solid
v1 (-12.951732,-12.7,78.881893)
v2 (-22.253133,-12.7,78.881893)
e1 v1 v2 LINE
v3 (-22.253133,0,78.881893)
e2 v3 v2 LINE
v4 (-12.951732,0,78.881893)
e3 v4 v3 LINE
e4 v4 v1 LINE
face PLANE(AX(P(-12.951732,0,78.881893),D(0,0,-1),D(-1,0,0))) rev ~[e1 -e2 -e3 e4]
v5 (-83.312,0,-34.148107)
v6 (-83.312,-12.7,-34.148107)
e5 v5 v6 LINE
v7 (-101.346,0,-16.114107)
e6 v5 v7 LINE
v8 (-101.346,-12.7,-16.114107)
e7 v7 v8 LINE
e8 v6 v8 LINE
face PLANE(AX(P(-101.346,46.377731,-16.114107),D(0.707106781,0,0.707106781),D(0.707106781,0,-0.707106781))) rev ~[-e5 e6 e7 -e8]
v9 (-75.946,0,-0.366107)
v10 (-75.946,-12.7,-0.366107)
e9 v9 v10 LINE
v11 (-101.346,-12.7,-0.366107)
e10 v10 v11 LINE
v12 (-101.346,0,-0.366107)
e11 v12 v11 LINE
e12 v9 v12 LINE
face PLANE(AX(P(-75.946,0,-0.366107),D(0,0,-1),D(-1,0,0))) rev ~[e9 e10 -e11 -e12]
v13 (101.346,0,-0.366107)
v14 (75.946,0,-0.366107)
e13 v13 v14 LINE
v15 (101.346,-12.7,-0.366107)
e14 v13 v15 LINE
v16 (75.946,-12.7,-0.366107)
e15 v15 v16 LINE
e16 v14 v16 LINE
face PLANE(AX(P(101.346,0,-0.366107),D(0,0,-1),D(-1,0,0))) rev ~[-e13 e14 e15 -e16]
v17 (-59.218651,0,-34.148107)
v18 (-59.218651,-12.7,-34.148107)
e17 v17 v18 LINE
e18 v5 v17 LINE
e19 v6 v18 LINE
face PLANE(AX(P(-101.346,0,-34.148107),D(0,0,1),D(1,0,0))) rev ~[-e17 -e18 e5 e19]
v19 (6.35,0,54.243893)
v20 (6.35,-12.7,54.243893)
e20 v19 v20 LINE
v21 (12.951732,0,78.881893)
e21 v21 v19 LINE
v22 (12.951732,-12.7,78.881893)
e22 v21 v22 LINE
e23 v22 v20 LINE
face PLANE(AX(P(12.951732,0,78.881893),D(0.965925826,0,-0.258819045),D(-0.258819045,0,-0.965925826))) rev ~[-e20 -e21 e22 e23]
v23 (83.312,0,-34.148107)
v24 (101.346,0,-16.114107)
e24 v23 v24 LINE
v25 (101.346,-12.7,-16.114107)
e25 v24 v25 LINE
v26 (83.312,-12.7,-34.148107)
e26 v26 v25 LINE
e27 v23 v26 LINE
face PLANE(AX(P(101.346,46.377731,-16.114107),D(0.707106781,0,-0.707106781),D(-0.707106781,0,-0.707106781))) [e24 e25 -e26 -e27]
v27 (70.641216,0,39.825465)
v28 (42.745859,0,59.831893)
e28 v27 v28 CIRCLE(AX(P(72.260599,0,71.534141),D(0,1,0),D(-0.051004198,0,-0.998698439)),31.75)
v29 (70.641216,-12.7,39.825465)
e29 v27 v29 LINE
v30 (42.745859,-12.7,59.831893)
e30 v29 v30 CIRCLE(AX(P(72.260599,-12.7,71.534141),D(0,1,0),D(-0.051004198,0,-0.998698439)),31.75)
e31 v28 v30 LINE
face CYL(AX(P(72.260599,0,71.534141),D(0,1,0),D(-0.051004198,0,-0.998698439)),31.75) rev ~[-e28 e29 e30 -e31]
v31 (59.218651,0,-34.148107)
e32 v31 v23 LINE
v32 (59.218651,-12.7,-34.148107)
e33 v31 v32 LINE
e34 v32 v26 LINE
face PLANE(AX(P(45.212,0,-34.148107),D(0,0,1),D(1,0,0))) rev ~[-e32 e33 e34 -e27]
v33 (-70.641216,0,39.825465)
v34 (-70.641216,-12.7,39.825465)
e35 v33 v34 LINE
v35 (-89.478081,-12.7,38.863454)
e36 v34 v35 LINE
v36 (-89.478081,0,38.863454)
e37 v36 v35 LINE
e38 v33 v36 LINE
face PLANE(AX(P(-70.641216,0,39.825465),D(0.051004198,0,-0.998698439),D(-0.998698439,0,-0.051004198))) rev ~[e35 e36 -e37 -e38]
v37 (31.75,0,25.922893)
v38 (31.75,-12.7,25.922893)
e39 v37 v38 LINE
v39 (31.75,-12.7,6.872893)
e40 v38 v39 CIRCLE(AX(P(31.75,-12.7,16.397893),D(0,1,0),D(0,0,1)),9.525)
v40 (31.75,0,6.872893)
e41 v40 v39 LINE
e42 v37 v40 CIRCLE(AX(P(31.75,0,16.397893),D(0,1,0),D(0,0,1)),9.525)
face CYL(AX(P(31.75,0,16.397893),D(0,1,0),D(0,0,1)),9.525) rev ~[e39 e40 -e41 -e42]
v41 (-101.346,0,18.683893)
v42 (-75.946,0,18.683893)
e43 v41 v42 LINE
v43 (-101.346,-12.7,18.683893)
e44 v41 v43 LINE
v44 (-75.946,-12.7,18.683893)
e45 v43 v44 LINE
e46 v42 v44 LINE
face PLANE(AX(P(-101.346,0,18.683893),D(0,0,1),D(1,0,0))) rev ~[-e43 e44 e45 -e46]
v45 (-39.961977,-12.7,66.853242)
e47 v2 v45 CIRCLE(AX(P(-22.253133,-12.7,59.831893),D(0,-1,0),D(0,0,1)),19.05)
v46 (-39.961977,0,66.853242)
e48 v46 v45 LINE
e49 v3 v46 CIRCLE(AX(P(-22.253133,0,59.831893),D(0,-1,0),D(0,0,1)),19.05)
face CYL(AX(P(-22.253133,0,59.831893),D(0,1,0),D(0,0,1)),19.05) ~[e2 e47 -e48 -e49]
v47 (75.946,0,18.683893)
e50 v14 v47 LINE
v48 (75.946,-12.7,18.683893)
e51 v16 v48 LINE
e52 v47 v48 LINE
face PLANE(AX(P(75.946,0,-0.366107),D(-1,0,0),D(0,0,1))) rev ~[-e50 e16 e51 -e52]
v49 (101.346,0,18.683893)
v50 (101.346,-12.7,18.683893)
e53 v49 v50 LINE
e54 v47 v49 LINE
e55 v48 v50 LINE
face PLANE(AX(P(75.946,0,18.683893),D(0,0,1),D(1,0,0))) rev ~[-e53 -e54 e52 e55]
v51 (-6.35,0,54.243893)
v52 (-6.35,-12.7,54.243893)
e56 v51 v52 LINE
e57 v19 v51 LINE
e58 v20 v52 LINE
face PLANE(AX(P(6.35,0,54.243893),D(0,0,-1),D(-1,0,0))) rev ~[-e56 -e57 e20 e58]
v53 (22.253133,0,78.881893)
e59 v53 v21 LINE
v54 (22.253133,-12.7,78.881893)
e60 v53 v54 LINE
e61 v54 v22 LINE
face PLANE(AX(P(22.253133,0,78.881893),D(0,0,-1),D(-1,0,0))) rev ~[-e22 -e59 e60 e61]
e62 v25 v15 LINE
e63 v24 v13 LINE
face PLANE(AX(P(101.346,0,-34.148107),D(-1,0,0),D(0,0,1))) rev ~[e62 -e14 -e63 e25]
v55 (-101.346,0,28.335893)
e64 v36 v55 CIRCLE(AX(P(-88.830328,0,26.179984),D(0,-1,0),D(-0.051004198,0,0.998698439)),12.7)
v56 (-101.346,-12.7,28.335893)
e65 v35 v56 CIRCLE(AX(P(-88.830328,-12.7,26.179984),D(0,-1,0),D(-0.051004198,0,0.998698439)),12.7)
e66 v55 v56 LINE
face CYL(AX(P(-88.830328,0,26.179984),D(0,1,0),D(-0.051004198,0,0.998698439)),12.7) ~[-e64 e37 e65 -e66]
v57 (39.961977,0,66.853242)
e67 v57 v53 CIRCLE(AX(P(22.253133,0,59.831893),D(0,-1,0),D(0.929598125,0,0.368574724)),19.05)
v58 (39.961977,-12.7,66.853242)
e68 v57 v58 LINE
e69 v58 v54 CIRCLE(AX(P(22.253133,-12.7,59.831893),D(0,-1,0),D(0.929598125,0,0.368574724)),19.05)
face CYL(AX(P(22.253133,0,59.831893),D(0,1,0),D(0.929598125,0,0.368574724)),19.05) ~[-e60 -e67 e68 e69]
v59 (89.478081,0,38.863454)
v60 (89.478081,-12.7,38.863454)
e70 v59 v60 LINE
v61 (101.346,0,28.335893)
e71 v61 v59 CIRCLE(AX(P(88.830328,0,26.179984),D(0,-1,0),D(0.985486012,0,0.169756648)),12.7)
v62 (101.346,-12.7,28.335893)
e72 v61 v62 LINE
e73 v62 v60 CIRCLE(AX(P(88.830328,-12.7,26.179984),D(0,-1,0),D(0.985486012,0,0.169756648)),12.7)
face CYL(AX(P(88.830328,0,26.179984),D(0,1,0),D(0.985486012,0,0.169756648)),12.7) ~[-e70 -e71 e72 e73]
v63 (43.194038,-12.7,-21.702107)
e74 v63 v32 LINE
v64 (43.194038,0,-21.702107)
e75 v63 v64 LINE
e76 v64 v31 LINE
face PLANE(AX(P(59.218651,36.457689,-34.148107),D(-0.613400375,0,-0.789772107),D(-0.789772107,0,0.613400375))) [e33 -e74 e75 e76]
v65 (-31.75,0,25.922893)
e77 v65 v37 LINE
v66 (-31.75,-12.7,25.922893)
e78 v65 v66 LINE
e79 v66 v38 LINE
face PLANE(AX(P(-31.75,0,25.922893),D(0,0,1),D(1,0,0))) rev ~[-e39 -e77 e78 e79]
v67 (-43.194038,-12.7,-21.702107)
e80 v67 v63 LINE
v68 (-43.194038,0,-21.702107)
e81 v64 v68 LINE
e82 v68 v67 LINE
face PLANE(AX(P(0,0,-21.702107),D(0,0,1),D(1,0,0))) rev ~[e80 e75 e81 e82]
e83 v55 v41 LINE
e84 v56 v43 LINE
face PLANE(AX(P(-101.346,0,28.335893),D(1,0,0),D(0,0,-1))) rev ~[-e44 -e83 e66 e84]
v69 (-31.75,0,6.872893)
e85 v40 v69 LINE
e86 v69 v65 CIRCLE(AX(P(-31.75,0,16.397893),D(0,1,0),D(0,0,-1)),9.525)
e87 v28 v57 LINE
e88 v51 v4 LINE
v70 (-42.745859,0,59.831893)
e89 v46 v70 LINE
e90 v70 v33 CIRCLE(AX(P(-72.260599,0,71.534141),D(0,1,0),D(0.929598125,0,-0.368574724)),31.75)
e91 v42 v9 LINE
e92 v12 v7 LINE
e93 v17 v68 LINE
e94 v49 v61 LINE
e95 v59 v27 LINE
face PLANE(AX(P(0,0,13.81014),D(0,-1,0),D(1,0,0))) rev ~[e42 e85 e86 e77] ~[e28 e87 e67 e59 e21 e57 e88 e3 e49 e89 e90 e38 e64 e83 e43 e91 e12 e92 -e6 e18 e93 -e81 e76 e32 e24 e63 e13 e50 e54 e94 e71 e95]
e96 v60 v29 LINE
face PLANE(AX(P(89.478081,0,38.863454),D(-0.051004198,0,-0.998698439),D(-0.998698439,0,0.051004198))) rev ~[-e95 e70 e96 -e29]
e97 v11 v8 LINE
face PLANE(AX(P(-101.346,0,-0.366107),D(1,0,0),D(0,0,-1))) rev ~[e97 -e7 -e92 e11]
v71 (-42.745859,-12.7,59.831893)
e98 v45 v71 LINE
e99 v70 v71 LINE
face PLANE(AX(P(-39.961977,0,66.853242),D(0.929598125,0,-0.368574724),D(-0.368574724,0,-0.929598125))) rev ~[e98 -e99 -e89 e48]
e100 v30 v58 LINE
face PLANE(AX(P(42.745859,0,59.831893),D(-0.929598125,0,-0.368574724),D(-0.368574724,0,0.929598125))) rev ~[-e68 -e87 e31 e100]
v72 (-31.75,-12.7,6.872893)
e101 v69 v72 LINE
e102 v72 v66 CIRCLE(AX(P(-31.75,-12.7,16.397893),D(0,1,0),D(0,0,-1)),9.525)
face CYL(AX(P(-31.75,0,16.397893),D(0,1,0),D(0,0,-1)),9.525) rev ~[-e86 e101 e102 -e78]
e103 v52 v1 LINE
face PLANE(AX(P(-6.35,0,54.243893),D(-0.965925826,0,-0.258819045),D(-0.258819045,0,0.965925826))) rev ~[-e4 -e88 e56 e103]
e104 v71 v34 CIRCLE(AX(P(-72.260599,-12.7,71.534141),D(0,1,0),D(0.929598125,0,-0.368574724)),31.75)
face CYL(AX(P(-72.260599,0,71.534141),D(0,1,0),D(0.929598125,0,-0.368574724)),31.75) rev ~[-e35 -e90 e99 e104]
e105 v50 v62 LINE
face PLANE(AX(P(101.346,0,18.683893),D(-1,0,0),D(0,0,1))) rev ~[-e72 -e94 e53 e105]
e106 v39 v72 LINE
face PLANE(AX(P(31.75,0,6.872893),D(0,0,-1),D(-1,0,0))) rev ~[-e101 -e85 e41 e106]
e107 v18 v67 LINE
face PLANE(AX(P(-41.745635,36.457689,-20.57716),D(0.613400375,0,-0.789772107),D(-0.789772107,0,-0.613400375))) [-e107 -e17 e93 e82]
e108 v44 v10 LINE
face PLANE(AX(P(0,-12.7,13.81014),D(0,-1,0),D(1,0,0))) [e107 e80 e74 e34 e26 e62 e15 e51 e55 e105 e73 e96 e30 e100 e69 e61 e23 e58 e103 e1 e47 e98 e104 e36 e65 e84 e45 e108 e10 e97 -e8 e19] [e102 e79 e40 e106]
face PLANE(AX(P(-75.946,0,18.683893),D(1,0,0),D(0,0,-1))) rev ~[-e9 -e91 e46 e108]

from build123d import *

# Parameters (mm, degrees)
F1_DEPTH     = 12.7
F2_T1_DEPTH  = 105.45546201
F2_T6_DEPTH  = 85.6153780659
F2_T11_DEPTH = 85.6153780659


# Not quite as in the source:
# - a fillet or chamfer that OpenCascade refuses, or shapes differently, is made with other operations: its cross-section is extruded or revolved along the edge and cut away or added


with BuildPart() as f1:
    # F0 (on Front) → F1 (new body)
    with BuildSketch(Plane.XZ):
        with BuildLine():
            Line((6.35, 54.2438933111), (-6.35, 54.2438933111))
            Line((-6.35, 54.2438933111), (-12.9517322031, 78.8818933111))
            Line((-12.9517322031, 78.8818933111), (-22.2531325433, 78.8818933111))
            ThreePointArc((-22.2531325433, 78.8818933111), (-32.9570059401, 75.5903702142), (-39.961976816, 66.8532417945))
            Line((-39.961976816, 66.8532417945), (-42.7458589128, 59.8318933111))
            ThreePointArc((-42.7458589128, 59.8318933111), (-53.7566077671, 45.7336602674), (-70.6412160864, 39.8254653493))
            Line((-70.6412160864, 39.8254653493), (-89.4780809568, 38.8634540506))
            ThreePointArc((-89.4780809568, 38.8634540506), (-97.258039529, 35.6807034492), (-101.346, 28.3358933111))
            Line((-101.346, 28.3358933111), (-101.346, 18.6838933111))
            Line((-101.346, 18.6838933111), (-75.946, 18.6838933111))
            Line((-75.946, 18.6838933111), (-75.946, -0.3661066889))
            Line((-75.946, -0.3661066889), (-101.346, -0.3661066889))
            Line((-101.346, -0.3661066889), (-101.346, -34.1481066889))
            Line((-101.346, -34.1481066889), (-45.212, -34.1481066889))
            Line((-45.212, -34.1481066889), (-42.0329745032, -21.7021066889))
            Line((-42.0329745032, -21.7021066889), (0, -21.7021066889))
            Line((0, -21.7021066889), (42.0329745032, -21.7021066889))
            Line((42.0329745032, -21.7021066889), (45.212, -34.1481066889))
            Line((45.212, -34.1481066889), (101.346, -34.1481066889))
            Line((101.346, -34.1481066889), (101.346, -0.3661066889))
            Line((101.346, -0.3661066889), (75.946, -0.3661066889))
            Line((75.946, -0.3661066889), (75.946, 18.6838933111))
            Line((75.946, 18.6838933111), (101.346, 18.6838933111))
            Line((101.346, 18.6838933111), (101.346, 28.3358933111))
            ThreePointArc((101.346, 28.3358933111), (97.258039529, 35.6807034492), (89.4780809568, 38.8634540506))
            Line((89.4780809568, 38.8634540506), (70.6412160864, 39.8254653493))
            ThreePointArc((70.6412160864, 39.8254653493), (53.7566077671, 45.7336602674), (42.7458589128, 59.8318933111))
            Line((42.7458589128, 59.8318933111), (39.961976816, 66.8532417945))
            ThreePointArc((39.961976816, 66.8532417945), (32.9570059401, 75.5903702142), (22.2531325433, 78.8818933111))
            Line((22.2531325433, 78.8818933111), (12.9517322031, 78.8818933111))
            Line((12.9517322031, 78.8818933111), (6.35, 54.2438933111))
        make_face()
        with BuildLine():
            ThreePointArc((-31.75, 6.8728933111), (-41.275, 16.3978933111), (-31.75, 25.9228933111))
            Line((-31.75, 25.9228933111), (31.75, 25.9228933111))
            ThreePointArc((31.75, 25.9228933111), (41.275, 16.3978933111), (31.75, 6.8728933111))
            Line((31.75, 6.8728933111), (-31.75, 6.8728933111))
        make_face(mode=Mode.SUBTRACT)
    extrude(amount=F1_DEPTH)

    # F2: chamfer of 18.034 on 4 edges, made by hand

    # F2_s2 → F2_t1 (cut)
    with BuildSketch(Plane.XZ.offset(-46.377731005)):
        Polygon((-101.346, -16.1141066889), (-83.312, -34.1481066889), (-101.346, -34.1481066889), align=None)
        Polygon((101.346, -16.1141066889), (83.312, -34.1481066889), (101.346, -34.1481066889), align=None)
    extrude(amount=F2_T1_DEPTH, mode=Mode.SUBTRACT)


with BuildPart() as f2_tool4:
    # F2_s5 → F2_t6 (new body)
    with BuildSketch(Plane.XZ.offset(-36.4576890329)):
        Polygon((-41.7456345338, -20.5771602982), (-59.218651116, -34.1481066889), (-45.212, -34.1481066889), align=None)
    extrude(amount=F2_T6_DEPTH)

    split(bisect_by=Plane.XY.offset(-21.7021066889), keep=Keep.BOTTOM)


with BuildPart() as f1_1:
    add(f1.part)

    # F2_t3: cut F2_tool4
    add(f2_tool4.part, mode=Mode.SUBTRACT)


with BuildPart() as f2_tool9:
    # F2_s10 → F2_t11 (new body)
    with BuildSketch(Plane.XZ.offset(-36.4576890329)):
        Polygon((59.218651116, -34.1481066889), (41.7456345338, -20.5771602982), (45.212, -34.1481066889), align=None)
    extrude(amount=F2_T11_DEPTH)

    split(bisect_by=Plane.XY.offset(-21.7021066889), keep=Keep.BOTTOM)


with BuildPart() as f1_2:
    add(f1_1.part)

    # F2_t8: cut F2_tool9
    add(f2_tool9.part, mode=Mode.SUBTRACT)


solid = f1_2.part
